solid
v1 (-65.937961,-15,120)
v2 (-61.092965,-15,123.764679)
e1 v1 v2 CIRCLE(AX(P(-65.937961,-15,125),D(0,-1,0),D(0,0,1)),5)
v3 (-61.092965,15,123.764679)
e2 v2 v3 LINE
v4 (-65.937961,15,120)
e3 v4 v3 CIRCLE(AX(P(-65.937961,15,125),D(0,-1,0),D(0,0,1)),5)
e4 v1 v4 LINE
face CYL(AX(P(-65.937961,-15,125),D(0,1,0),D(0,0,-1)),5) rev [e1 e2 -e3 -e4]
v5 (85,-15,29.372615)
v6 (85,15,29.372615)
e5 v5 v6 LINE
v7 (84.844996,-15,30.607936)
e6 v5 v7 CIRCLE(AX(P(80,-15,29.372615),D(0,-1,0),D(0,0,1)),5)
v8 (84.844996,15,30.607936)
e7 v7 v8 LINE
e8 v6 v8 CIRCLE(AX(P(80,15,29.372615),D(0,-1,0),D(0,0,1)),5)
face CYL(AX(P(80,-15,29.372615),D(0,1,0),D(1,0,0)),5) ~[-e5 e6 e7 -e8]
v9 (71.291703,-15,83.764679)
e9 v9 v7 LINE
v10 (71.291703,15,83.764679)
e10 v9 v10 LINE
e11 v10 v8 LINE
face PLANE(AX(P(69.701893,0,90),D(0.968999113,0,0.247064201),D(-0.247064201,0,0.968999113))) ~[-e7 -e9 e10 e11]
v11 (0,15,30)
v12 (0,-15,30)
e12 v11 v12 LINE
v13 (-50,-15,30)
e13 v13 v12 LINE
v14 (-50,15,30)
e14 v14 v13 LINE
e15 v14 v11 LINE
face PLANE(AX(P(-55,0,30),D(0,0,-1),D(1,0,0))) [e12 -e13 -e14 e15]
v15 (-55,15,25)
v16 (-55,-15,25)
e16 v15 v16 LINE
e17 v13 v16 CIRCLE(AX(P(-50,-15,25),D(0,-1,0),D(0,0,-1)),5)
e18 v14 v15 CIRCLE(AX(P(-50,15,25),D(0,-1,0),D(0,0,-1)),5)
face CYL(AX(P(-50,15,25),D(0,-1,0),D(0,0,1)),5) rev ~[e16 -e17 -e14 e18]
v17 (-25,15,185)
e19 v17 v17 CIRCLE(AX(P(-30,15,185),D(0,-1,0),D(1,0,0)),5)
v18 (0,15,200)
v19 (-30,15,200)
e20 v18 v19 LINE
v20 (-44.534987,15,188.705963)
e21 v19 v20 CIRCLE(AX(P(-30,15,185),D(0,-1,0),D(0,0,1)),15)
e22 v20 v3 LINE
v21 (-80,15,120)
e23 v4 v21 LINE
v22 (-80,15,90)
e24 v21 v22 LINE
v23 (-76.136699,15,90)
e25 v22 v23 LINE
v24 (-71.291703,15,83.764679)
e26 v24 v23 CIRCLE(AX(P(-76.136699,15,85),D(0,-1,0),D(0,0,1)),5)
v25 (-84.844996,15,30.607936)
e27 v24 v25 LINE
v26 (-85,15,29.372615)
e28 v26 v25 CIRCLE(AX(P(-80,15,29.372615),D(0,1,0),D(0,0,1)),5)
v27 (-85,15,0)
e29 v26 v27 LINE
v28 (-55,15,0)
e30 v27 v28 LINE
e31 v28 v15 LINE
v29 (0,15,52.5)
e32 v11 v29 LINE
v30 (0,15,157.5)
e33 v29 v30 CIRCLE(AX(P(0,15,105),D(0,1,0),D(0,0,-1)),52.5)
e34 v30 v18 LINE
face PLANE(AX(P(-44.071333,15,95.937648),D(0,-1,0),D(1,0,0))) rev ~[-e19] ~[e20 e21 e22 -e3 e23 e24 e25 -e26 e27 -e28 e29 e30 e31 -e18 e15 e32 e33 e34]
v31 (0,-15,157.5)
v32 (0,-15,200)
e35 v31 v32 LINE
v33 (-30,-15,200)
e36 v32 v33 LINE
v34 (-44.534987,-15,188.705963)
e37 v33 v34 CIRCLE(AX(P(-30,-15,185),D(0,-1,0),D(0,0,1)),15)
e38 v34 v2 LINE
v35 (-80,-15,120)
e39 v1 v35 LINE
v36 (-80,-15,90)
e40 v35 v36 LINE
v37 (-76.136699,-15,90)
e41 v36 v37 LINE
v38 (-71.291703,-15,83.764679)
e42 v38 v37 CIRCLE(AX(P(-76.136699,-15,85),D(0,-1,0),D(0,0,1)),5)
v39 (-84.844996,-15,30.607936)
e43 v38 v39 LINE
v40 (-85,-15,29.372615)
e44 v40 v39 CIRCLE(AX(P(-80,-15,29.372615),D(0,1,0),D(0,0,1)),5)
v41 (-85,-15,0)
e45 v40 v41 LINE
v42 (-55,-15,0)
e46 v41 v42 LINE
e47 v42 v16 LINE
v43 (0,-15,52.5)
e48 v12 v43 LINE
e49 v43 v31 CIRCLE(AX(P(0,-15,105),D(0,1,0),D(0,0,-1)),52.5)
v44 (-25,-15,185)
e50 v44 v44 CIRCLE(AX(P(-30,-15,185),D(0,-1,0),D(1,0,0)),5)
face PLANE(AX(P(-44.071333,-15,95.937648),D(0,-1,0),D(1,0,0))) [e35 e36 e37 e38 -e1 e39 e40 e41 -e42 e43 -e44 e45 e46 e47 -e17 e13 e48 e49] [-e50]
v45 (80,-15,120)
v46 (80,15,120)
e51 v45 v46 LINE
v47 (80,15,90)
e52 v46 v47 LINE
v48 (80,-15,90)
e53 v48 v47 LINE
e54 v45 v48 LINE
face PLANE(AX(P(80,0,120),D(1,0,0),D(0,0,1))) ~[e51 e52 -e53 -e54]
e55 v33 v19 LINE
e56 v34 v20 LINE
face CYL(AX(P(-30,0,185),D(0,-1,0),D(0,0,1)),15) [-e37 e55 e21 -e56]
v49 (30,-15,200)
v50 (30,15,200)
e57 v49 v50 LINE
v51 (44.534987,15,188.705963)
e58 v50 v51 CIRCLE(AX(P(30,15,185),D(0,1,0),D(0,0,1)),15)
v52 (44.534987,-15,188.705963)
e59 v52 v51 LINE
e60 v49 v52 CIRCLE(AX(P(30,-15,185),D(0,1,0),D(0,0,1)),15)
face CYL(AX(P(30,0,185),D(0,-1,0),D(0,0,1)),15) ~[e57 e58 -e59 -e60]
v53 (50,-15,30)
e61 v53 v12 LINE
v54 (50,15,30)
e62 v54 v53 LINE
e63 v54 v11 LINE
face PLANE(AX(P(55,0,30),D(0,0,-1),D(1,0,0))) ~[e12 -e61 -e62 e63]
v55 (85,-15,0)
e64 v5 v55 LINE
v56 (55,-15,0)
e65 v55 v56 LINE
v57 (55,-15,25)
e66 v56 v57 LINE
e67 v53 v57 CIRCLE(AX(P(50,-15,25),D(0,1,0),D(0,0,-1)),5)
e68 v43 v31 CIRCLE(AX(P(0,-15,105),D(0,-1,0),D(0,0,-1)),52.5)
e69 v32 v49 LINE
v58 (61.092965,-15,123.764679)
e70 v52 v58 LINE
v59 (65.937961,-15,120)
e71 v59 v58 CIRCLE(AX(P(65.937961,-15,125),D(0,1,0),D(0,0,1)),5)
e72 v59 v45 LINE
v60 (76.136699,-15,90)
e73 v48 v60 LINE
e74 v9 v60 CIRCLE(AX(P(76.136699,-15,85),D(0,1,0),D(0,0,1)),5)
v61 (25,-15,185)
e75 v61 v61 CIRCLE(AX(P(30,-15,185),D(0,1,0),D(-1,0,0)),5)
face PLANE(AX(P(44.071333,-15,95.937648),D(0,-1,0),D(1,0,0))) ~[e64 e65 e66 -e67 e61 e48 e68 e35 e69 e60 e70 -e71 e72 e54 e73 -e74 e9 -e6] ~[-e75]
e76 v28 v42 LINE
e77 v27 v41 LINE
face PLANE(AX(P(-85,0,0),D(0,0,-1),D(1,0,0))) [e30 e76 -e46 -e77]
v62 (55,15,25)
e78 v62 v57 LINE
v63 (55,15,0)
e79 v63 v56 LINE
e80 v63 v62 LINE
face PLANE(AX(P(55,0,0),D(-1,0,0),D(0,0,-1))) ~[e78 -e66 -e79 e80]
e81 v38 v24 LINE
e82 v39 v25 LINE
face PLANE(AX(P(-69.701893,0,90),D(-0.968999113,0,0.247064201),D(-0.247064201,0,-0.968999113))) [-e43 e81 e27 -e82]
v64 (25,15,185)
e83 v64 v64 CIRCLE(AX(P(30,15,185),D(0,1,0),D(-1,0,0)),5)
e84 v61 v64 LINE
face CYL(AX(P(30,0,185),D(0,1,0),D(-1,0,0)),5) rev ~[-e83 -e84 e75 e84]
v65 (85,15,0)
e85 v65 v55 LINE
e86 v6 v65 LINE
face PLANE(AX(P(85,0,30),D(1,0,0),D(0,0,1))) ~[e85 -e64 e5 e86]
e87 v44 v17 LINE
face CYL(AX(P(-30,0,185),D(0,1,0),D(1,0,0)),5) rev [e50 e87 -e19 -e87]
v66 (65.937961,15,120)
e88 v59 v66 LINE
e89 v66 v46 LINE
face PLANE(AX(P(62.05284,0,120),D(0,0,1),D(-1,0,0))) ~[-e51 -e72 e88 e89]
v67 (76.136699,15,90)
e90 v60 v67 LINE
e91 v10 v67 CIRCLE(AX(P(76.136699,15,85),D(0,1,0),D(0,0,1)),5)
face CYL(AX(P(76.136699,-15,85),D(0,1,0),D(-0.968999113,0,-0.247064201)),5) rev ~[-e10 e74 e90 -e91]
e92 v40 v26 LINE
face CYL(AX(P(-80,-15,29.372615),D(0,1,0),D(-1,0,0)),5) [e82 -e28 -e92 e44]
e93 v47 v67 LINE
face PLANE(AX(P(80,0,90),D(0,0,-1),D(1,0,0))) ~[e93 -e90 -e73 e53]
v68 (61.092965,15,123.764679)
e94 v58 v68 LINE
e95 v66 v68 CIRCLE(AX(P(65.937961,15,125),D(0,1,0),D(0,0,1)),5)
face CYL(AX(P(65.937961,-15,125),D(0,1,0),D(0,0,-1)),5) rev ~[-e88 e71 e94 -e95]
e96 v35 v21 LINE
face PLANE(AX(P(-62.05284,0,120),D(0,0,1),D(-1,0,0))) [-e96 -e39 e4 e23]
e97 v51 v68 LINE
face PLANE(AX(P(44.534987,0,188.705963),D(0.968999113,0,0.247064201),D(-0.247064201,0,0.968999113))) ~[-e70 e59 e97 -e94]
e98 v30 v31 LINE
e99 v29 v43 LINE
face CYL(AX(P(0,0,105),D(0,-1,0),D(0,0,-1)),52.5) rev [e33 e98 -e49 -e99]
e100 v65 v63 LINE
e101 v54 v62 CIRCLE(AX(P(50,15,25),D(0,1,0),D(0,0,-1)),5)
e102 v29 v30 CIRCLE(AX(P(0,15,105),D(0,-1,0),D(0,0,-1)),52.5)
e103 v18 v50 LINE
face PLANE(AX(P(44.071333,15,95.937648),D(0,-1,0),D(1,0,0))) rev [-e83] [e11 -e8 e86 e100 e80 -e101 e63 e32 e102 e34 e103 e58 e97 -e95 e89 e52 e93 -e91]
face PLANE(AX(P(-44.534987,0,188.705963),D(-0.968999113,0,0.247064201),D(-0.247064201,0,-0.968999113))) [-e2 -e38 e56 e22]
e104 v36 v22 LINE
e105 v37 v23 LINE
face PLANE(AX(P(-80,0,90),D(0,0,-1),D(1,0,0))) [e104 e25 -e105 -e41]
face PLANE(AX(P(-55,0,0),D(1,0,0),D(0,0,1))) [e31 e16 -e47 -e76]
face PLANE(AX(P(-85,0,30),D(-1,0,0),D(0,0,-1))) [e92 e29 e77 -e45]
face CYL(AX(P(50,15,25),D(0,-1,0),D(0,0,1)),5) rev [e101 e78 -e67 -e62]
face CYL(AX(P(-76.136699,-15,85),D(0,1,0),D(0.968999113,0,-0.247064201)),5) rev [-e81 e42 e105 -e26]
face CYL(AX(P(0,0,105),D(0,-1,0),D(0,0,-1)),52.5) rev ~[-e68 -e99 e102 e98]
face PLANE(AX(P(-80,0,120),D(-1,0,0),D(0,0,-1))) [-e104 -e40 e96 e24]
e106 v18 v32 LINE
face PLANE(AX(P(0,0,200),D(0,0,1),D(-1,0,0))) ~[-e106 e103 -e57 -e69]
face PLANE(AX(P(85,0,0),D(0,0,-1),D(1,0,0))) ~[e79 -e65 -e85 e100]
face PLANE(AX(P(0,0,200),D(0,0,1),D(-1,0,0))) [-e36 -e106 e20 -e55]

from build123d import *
from build123d import SkipClean  # not in build123d's __all__

# Parameters (mm, degrees)
F0_R     = 5
F1_DEPTH = 15
F2_R     = 5


with BuildPart() as f1:
    # F0 (on Front) → F1 (new body, symmetric)
    with BuildSketch(Plane.XZ):
        with BuildLine():
            Line((-85, 30), (-85, 0))
            Line((-85, 0), (-55, 0))
            Line((-55, 0), (-55, 30))
            Line((-55, 30), (0, 30))
            Line((0, 30), (0, 52.5))
            ThreePointArc((0, 52.5), (-52.5, 105), (0, 157.5))
            Line((0, 157.5), (0, 200))
            Line((0, 200), (-30, 200))
            ThreePointArc((-30, 200), (-39.2035469986, 196.8446073234), (-44.5349866907, 188.7059630193))
            Line((-44.5349866907, 188.7059630193), (-62.0528395496, 120))
            Line((-62.0528395496, 120), (-80, 120))
            Line((-80, 120), (-80, 90))
            Line((-80, 90), (-69.7018930331, 90))
            Line((-69.7018930331, 90), (-85, 30))
        make_face()
        with Locations((-30, 185)):
            Circle(F0_R, mode=Mode.SUBTRACT)
    extrude(amount=F1_DEPTH, both=True)

    # F2
    f2_edges = [f1.edges().sort_by_distance(p)[0] for p in [
        (-69.701893, 0, 90),
        (-62.05284, 0, 120),
        (-85, 0, 30),
        (-55, 0, 30),
    ]]
    fillet(f2_edges, radius=F2_R)

    # F3: F1 across plane


with BuildPart() as f1_1:
    add(f1.part, clean=False)
    with SkipClean():  # cleaning this boolean's faces spoils the solid; the shape is the same uncleaned
        add(f1.part.mirror(Plane.YZ), clean=False)


solid = f1_1.part
